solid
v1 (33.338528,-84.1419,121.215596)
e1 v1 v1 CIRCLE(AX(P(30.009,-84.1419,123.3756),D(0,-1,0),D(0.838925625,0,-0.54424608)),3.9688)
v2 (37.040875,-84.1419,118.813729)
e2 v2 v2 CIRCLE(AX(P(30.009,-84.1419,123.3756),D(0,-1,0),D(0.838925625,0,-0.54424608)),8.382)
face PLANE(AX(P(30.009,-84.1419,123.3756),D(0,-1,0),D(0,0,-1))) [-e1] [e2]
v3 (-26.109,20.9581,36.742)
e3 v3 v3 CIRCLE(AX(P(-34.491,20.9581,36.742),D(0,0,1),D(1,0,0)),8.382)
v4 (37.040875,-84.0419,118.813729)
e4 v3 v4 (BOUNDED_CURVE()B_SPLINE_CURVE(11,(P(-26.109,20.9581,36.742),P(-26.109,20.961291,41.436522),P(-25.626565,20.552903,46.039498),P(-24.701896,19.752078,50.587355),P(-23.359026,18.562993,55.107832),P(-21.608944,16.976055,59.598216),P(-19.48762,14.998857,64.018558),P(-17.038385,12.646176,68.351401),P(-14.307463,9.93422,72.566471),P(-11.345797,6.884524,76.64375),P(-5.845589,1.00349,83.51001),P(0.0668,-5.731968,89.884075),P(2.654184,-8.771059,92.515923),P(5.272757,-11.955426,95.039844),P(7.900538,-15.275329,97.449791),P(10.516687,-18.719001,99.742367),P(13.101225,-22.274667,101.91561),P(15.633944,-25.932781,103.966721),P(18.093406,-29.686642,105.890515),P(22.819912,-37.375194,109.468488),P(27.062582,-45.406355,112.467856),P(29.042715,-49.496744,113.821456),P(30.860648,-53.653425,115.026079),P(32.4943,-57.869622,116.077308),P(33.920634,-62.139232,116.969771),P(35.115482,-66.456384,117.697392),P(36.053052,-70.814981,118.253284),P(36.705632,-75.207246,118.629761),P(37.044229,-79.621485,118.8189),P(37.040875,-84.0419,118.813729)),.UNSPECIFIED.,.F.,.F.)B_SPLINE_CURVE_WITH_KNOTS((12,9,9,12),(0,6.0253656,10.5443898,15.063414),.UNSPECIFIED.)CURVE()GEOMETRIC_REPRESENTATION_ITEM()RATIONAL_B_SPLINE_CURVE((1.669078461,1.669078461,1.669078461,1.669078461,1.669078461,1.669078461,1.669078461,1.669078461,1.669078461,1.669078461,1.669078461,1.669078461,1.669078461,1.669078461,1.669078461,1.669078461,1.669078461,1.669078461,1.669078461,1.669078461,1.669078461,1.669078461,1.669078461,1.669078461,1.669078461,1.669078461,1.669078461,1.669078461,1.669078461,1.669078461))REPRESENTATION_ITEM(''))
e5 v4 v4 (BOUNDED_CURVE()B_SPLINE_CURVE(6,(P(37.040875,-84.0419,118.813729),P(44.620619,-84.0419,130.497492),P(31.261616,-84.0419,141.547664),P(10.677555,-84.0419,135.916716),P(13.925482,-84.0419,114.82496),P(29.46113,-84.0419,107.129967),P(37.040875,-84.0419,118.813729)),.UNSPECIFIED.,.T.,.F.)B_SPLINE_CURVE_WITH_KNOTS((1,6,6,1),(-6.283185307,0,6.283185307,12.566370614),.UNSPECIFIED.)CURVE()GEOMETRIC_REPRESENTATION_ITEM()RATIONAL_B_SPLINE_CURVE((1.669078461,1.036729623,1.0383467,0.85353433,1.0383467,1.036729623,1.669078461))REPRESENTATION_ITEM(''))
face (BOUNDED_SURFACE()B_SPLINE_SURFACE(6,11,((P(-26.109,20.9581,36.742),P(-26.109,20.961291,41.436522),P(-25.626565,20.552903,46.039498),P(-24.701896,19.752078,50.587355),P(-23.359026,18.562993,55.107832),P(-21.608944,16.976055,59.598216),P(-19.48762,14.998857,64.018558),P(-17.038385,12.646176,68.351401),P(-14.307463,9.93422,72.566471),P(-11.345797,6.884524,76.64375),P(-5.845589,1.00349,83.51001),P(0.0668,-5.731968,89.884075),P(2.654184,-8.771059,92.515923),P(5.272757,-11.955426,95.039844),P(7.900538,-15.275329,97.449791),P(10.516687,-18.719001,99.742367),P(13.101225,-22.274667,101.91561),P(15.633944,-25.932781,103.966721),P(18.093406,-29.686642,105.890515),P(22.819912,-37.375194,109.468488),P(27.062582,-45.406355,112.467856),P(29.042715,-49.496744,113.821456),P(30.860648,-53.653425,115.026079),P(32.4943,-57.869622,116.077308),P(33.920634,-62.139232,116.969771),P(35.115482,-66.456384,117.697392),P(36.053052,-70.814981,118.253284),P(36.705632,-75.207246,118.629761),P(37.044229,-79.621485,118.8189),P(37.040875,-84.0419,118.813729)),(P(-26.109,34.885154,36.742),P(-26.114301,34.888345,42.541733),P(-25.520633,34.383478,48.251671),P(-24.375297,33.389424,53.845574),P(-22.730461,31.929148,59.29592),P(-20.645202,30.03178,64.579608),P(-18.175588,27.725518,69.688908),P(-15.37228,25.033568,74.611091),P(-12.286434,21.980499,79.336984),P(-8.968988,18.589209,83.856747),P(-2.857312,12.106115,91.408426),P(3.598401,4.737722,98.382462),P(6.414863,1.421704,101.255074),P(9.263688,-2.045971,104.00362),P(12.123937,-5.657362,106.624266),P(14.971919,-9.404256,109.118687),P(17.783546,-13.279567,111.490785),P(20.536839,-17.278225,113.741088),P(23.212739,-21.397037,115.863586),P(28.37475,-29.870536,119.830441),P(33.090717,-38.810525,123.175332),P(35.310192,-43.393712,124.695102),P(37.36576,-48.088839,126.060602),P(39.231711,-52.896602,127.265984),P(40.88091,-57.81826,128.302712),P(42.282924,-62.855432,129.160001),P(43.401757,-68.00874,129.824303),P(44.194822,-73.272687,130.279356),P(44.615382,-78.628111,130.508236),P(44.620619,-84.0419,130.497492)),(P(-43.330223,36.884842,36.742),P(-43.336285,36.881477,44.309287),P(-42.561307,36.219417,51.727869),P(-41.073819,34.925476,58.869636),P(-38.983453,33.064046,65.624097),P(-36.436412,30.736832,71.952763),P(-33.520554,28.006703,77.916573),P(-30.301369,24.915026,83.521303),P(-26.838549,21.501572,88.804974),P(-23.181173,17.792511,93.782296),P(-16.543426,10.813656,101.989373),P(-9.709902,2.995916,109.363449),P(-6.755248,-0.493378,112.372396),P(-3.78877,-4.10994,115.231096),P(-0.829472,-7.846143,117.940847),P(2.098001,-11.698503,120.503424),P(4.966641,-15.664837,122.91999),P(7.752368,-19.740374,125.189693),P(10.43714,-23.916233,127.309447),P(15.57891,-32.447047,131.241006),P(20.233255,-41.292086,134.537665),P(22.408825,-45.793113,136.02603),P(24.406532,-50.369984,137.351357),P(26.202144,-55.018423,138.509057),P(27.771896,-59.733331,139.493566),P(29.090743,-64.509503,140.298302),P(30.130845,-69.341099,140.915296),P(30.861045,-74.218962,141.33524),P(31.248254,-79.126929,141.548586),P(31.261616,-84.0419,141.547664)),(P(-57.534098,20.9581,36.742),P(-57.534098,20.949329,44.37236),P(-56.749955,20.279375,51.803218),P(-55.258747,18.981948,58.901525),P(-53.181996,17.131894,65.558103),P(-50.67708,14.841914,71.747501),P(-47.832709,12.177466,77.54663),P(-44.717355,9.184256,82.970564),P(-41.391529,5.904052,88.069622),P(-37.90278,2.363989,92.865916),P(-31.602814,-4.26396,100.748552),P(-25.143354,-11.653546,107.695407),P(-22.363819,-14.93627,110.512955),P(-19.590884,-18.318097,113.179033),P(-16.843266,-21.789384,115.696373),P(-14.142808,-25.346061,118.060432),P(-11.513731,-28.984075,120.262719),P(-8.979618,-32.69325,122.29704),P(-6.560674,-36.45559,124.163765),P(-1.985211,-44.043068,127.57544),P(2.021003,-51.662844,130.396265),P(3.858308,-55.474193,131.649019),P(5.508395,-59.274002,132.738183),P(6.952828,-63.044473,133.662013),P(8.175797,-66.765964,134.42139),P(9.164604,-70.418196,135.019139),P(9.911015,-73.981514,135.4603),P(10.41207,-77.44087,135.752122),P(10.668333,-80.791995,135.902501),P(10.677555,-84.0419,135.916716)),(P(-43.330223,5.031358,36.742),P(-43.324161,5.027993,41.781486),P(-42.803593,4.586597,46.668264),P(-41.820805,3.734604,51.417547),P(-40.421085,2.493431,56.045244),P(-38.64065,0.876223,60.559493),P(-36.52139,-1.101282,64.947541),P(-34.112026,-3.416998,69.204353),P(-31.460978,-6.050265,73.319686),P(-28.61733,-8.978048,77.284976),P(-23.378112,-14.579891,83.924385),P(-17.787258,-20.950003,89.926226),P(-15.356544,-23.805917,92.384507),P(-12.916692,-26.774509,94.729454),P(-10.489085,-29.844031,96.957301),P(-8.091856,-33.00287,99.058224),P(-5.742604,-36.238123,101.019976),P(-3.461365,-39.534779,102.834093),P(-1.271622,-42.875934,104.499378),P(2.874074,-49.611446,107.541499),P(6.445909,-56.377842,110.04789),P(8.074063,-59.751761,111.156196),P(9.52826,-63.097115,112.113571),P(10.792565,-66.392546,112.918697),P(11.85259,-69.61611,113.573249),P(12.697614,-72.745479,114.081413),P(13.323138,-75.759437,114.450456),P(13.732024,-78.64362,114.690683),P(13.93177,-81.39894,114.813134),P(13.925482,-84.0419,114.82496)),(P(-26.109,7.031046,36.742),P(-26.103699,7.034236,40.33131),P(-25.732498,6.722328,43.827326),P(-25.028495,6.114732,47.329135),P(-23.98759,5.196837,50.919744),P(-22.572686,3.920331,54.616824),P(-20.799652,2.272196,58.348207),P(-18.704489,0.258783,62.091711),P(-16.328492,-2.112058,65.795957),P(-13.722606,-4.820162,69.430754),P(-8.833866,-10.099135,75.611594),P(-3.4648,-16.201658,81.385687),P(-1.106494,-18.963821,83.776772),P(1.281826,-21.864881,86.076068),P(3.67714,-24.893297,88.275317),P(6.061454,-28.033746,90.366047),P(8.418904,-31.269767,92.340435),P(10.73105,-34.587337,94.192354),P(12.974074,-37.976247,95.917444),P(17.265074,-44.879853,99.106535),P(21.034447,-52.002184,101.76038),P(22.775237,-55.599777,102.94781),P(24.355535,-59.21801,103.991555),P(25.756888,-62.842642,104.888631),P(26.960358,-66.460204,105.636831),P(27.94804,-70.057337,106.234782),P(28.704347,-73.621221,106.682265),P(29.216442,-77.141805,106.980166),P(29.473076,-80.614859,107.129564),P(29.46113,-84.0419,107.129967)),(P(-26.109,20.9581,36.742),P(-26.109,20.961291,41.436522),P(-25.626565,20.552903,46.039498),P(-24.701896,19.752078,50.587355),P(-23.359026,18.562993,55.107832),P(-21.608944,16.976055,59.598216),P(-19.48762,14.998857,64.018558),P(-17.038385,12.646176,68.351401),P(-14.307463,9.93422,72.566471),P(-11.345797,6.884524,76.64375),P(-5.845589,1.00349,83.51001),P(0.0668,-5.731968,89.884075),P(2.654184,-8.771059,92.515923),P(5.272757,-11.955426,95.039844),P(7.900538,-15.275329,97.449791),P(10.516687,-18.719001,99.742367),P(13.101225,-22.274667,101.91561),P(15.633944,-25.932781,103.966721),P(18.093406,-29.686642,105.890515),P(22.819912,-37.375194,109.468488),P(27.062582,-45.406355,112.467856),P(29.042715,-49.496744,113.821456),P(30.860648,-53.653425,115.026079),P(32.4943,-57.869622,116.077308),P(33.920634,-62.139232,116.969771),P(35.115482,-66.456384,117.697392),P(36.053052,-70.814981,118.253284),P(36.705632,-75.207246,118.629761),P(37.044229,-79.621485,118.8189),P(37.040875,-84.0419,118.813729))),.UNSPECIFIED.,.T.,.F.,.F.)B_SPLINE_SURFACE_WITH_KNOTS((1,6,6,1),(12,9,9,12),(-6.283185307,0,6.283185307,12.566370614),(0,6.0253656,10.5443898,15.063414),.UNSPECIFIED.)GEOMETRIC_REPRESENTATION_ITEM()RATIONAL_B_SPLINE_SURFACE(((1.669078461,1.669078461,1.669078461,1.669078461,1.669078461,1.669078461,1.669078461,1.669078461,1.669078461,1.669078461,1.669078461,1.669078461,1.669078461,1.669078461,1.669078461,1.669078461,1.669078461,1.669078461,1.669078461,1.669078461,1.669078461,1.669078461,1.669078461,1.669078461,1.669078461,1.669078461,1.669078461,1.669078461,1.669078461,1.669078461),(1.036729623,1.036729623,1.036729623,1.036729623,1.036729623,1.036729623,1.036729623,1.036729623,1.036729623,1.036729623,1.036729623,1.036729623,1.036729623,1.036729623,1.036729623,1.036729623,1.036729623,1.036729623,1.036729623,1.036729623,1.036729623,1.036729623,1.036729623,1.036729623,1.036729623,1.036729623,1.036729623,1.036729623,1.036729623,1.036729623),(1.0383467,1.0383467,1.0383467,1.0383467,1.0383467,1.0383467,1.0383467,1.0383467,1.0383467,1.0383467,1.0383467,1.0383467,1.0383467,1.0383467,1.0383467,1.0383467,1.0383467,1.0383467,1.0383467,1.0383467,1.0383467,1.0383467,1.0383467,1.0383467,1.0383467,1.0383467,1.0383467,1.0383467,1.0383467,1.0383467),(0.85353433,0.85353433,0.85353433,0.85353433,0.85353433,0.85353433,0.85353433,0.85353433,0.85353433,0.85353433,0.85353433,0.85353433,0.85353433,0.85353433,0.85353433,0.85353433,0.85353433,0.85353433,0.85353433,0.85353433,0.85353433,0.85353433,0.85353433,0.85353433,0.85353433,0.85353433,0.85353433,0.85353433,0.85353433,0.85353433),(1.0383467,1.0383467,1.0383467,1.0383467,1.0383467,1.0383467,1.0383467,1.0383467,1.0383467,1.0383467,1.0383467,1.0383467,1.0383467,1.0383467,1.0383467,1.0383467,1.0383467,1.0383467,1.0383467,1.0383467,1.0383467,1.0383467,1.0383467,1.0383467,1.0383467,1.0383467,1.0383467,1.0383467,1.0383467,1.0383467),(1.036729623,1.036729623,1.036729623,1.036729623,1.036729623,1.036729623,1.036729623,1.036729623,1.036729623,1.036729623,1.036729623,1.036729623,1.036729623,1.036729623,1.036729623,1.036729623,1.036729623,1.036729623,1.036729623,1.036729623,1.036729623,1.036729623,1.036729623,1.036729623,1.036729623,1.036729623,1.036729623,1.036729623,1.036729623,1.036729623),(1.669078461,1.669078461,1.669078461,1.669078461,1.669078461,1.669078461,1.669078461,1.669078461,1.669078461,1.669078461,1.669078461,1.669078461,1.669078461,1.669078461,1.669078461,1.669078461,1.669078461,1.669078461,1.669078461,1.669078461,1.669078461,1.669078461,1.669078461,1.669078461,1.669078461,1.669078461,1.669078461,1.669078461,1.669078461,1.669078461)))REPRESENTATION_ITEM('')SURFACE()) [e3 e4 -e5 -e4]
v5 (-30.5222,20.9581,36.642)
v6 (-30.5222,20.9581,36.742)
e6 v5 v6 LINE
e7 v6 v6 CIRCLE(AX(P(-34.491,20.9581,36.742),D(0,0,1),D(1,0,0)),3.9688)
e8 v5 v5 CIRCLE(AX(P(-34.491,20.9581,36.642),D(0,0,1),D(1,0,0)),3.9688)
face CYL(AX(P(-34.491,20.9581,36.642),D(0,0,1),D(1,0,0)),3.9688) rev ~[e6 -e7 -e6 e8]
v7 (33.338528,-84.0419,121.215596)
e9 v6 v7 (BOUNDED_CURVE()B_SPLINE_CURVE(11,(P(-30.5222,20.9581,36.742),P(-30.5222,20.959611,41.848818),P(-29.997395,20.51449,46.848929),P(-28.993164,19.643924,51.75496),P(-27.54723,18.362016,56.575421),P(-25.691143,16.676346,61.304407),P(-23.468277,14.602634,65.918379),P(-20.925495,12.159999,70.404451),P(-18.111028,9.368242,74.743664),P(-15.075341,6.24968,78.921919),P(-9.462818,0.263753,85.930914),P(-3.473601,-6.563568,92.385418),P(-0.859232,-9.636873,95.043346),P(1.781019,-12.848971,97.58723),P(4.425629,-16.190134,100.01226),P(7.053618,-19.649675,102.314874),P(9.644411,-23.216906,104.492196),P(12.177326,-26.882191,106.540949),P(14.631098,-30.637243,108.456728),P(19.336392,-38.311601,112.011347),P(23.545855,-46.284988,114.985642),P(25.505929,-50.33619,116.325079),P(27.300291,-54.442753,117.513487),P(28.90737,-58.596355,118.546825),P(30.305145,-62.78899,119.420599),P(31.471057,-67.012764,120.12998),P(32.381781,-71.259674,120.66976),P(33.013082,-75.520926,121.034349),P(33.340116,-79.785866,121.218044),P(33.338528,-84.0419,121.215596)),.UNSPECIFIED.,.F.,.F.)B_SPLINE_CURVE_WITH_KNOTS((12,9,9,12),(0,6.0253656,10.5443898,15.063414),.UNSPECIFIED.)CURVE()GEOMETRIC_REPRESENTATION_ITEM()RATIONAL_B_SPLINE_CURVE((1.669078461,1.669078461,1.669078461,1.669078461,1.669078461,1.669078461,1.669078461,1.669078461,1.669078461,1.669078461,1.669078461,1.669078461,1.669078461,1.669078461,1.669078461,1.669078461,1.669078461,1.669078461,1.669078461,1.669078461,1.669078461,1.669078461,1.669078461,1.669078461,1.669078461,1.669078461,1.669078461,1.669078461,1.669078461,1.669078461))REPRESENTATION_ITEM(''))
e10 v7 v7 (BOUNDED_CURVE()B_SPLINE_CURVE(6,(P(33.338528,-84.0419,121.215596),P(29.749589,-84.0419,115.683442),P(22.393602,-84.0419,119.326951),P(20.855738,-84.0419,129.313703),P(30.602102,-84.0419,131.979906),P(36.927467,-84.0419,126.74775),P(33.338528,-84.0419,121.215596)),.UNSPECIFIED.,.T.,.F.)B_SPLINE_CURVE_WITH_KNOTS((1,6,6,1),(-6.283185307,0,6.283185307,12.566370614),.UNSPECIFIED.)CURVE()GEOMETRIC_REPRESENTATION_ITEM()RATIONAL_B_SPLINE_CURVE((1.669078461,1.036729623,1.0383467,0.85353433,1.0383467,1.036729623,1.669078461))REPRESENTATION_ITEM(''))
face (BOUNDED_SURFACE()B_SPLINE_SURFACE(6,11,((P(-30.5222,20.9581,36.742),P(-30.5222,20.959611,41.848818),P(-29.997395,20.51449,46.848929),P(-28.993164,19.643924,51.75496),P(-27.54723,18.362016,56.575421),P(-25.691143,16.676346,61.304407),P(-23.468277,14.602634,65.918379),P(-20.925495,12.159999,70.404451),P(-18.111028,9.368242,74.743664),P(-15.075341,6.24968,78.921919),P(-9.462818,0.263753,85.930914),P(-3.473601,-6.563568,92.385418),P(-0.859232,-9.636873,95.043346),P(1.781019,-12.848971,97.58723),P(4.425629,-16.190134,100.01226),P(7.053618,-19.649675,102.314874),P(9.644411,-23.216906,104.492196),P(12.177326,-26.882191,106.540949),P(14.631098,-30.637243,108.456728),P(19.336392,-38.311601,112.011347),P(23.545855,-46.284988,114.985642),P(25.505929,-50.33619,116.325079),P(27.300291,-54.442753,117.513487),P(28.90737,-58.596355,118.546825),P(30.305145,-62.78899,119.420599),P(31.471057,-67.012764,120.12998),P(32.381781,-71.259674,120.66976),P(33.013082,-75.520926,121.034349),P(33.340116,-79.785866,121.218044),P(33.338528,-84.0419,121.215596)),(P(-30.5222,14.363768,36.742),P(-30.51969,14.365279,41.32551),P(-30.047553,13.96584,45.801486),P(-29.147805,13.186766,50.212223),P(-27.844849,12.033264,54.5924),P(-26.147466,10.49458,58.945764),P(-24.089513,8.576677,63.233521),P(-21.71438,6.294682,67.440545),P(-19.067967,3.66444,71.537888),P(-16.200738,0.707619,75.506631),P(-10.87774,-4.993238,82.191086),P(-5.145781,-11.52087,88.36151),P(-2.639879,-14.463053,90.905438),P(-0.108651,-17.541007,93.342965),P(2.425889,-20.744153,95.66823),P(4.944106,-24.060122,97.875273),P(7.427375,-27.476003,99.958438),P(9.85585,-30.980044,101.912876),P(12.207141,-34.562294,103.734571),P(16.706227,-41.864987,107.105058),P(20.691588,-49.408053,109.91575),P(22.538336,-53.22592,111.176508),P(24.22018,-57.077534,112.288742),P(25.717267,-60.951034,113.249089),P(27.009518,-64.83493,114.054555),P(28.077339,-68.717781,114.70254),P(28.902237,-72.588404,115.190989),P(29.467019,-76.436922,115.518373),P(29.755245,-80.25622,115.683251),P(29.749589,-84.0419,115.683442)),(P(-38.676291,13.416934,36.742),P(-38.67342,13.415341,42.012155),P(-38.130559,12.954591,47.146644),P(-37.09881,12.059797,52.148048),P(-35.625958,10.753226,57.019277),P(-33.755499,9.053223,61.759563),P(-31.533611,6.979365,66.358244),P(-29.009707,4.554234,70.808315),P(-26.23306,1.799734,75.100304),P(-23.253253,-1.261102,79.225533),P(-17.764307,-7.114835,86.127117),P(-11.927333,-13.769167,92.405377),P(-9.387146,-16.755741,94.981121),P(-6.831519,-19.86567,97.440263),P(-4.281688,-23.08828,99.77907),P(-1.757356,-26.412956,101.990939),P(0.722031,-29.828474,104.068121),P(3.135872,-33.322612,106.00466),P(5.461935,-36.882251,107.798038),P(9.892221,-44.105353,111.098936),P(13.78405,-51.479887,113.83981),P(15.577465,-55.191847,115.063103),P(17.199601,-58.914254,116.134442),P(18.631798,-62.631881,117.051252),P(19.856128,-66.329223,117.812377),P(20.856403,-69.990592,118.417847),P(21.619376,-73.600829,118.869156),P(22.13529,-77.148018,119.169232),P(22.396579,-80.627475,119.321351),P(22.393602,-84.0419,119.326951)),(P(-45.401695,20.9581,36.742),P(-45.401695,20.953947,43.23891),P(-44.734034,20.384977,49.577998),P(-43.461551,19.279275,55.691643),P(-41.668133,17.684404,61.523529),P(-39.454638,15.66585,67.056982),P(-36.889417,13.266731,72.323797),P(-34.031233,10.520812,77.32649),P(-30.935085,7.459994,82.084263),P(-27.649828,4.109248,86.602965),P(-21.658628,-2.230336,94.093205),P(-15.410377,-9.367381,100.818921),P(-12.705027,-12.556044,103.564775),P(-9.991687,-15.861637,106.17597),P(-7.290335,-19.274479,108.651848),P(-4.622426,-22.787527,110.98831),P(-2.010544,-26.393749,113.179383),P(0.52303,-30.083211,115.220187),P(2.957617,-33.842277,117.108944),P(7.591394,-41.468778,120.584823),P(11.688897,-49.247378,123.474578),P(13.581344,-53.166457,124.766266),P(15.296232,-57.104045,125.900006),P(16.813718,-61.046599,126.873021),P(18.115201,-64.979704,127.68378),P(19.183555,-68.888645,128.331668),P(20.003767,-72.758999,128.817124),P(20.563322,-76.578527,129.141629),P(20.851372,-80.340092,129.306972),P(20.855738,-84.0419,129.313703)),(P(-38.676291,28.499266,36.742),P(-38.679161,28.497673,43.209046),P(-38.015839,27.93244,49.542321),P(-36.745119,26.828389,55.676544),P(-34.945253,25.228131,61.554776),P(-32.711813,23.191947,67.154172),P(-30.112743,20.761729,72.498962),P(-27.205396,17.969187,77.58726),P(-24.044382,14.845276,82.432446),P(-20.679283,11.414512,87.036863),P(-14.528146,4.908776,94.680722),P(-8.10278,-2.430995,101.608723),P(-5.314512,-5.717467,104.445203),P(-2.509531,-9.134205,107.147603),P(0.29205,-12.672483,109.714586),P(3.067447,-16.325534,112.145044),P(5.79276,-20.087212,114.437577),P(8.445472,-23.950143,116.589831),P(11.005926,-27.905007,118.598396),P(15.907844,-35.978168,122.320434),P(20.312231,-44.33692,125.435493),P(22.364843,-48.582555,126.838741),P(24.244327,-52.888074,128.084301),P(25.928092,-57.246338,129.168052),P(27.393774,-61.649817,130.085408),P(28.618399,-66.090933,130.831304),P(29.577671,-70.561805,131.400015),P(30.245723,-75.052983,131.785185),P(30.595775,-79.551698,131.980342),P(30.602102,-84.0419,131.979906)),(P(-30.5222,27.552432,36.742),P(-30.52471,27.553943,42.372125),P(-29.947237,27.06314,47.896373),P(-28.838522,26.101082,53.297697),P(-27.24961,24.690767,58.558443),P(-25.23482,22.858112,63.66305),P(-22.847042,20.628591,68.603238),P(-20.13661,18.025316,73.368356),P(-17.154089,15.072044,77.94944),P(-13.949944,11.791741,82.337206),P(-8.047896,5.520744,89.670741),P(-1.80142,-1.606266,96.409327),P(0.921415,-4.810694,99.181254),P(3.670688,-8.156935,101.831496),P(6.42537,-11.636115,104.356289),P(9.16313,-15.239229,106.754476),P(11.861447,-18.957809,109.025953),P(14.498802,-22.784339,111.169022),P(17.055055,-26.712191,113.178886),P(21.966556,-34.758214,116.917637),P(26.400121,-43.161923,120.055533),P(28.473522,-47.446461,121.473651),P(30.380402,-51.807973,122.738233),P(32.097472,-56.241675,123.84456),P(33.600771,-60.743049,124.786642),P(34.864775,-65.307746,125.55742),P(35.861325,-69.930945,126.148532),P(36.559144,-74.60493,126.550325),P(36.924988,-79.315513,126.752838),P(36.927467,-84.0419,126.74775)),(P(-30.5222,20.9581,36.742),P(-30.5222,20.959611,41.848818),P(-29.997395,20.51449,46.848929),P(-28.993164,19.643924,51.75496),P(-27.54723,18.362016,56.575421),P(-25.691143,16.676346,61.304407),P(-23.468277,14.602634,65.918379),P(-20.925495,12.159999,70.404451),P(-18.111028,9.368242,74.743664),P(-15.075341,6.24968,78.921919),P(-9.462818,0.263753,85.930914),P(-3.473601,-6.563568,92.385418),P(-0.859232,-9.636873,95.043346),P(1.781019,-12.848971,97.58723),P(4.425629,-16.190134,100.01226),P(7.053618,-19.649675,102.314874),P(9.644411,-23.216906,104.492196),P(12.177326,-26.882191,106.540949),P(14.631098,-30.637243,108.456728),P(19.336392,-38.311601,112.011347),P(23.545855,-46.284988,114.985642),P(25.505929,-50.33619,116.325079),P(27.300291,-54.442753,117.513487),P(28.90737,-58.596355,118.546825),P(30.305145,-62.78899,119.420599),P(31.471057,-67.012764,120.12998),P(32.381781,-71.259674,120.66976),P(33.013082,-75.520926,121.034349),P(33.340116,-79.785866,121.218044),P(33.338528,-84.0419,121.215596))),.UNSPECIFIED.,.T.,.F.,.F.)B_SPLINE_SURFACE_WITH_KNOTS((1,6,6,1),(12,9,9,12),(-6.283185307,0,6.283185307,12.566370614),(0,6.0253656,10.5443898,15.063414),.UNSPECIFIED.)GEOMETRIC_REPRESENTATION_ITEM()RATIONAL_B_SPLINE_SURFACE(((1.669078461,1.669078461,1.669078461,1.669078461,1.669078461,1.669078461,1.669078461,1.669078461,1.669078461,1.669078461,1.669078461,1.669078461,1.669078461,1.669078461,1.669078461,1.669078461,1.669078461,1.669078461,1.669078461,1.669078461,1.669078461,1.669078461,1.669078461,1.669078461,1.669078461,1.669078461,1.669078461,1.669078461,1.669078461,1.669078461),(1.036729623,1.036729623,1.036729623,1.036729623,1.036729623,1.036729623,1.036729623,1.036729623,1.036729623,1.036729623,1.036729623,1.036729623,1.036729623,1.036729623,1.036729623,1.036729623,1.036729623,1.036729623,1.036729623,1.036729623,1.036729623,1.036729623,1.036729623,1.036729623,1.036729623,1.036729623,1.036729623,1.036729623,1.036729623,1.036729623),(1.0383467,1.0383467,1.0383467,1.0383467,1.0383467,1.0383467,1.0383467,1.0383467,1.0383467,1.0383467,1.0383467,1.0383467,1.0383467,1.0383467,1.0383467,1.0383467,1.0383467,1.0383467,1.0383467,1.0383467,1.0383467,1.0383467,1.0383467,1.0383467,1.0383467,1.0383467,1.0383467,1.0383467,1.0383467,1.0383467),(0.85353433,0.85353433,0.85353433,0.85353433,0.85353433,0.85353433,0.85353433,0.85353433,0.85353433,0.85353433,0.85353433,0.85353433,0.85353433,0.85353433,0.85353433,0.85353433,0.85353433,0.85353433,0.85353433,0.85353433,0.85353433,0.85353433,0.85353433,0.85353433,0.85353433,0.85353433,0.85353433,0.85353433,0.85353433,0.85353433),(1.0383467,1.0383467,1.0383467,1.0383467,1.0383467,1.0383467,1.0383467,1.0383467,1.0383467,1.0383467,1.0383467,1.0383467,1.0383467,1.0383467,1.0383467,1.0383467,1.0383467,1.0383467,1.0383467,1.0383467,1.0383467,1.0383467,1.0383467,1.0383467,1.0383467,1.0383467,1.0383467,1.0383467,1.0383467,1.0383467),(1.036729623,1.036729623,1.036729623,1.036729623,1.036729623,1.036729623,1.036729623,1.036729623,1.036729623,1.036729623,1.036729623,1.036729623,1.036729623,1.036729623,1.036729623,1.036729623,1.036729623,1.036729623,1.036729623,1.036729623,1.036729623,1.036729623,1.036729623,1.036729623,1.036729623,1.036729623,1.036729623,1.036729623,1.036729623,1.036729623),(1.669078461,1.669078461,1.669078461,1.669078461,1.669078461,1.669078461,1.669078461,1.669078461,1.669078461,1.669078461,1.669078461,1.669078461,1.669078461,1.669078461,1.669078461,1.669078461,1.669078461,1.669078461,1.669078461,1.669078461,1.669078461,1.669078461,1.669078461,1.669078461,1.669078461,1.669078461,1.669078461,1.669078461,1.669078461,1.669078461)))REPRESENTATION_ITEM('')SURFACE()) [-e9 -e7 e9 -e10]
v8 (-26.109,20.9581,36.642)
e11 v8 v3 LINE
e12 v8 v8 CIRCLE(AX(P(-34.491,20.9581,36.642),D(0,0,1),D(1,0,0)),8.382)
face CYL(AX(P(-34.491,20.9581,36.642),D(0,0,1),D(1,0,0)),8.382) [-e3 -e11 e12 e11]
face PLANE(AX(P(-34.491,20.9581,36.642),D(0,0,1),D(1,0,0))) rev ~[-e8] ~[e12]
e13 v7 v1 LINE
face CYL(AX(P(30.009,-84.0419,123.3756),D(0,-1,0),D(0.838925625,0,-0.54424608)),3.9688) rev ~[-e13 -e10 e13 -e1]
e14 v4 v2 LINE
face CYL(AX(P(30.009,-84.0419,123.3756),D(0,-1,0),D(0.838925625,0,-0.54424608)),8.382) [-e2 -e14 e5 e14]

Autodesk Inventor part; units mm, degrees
ref_plane "YZ Plane" through (0, 0, 0) normal (1, 0, 0) x (0, 1, 0)
ref_plane "XZ Plane" through (0, 0, 0) normal (0, 1, 0) x (-1, 0, 0)
ref_plane "XY Plane" through (0, 0, 0) normal (0, 0, 1) x (1, 0, 0)
ref_plane "Arbeitsebene1" through (-34.491, 20.9581, 36.742) normal (0, 0, 1) x (1, 0, 0)
sketch "Skizze2" plane through (-34.491, 20.9581, 36.742) normal (0, 0, 1) x (1, 0, 0)
  circle A0 centre (0, 0) radius 8.382
  circle A1 centre (0, 0) radius 3.9688
sketch3d "3D-Skizze1"
  line L0 (-34.491, 20.9581, 36.642) -> (-34.491, 20.9581, 36.742)
  spline S0 degree 3 poles (-34.491, 20.9581, 36.742) (-34.491, 20.9581, 86.9533) (30.009, -33.8305, 123.3756) (30.009, -84.0419, 123.3756) knots 0 0 0 0 15.063414 15.063414 15.063414 15.063414
  line L1 (30.009, -84.0419, 123.3756) -> (30.009, -84.1419, 123.3756)
  dimension "d4" = 1
  dimension "d5" = 1
sweep "Sweeping1" add profiles "Skizze2" path "3D-Skizze1"
equation "\"ID\" = 7.9375"
equation "\"OD\" = 16.764"
equation "\"L\" = PL"
equation "\"PL\" = 165.481"
equation "\"Size_Designation\" = 0.3125"
equation "\"RPL\" = 168.275"
equation "\"OPL\" = 165.481"
equation "\"ROPL\" = 168.275"
properties material "Kautschuk"
